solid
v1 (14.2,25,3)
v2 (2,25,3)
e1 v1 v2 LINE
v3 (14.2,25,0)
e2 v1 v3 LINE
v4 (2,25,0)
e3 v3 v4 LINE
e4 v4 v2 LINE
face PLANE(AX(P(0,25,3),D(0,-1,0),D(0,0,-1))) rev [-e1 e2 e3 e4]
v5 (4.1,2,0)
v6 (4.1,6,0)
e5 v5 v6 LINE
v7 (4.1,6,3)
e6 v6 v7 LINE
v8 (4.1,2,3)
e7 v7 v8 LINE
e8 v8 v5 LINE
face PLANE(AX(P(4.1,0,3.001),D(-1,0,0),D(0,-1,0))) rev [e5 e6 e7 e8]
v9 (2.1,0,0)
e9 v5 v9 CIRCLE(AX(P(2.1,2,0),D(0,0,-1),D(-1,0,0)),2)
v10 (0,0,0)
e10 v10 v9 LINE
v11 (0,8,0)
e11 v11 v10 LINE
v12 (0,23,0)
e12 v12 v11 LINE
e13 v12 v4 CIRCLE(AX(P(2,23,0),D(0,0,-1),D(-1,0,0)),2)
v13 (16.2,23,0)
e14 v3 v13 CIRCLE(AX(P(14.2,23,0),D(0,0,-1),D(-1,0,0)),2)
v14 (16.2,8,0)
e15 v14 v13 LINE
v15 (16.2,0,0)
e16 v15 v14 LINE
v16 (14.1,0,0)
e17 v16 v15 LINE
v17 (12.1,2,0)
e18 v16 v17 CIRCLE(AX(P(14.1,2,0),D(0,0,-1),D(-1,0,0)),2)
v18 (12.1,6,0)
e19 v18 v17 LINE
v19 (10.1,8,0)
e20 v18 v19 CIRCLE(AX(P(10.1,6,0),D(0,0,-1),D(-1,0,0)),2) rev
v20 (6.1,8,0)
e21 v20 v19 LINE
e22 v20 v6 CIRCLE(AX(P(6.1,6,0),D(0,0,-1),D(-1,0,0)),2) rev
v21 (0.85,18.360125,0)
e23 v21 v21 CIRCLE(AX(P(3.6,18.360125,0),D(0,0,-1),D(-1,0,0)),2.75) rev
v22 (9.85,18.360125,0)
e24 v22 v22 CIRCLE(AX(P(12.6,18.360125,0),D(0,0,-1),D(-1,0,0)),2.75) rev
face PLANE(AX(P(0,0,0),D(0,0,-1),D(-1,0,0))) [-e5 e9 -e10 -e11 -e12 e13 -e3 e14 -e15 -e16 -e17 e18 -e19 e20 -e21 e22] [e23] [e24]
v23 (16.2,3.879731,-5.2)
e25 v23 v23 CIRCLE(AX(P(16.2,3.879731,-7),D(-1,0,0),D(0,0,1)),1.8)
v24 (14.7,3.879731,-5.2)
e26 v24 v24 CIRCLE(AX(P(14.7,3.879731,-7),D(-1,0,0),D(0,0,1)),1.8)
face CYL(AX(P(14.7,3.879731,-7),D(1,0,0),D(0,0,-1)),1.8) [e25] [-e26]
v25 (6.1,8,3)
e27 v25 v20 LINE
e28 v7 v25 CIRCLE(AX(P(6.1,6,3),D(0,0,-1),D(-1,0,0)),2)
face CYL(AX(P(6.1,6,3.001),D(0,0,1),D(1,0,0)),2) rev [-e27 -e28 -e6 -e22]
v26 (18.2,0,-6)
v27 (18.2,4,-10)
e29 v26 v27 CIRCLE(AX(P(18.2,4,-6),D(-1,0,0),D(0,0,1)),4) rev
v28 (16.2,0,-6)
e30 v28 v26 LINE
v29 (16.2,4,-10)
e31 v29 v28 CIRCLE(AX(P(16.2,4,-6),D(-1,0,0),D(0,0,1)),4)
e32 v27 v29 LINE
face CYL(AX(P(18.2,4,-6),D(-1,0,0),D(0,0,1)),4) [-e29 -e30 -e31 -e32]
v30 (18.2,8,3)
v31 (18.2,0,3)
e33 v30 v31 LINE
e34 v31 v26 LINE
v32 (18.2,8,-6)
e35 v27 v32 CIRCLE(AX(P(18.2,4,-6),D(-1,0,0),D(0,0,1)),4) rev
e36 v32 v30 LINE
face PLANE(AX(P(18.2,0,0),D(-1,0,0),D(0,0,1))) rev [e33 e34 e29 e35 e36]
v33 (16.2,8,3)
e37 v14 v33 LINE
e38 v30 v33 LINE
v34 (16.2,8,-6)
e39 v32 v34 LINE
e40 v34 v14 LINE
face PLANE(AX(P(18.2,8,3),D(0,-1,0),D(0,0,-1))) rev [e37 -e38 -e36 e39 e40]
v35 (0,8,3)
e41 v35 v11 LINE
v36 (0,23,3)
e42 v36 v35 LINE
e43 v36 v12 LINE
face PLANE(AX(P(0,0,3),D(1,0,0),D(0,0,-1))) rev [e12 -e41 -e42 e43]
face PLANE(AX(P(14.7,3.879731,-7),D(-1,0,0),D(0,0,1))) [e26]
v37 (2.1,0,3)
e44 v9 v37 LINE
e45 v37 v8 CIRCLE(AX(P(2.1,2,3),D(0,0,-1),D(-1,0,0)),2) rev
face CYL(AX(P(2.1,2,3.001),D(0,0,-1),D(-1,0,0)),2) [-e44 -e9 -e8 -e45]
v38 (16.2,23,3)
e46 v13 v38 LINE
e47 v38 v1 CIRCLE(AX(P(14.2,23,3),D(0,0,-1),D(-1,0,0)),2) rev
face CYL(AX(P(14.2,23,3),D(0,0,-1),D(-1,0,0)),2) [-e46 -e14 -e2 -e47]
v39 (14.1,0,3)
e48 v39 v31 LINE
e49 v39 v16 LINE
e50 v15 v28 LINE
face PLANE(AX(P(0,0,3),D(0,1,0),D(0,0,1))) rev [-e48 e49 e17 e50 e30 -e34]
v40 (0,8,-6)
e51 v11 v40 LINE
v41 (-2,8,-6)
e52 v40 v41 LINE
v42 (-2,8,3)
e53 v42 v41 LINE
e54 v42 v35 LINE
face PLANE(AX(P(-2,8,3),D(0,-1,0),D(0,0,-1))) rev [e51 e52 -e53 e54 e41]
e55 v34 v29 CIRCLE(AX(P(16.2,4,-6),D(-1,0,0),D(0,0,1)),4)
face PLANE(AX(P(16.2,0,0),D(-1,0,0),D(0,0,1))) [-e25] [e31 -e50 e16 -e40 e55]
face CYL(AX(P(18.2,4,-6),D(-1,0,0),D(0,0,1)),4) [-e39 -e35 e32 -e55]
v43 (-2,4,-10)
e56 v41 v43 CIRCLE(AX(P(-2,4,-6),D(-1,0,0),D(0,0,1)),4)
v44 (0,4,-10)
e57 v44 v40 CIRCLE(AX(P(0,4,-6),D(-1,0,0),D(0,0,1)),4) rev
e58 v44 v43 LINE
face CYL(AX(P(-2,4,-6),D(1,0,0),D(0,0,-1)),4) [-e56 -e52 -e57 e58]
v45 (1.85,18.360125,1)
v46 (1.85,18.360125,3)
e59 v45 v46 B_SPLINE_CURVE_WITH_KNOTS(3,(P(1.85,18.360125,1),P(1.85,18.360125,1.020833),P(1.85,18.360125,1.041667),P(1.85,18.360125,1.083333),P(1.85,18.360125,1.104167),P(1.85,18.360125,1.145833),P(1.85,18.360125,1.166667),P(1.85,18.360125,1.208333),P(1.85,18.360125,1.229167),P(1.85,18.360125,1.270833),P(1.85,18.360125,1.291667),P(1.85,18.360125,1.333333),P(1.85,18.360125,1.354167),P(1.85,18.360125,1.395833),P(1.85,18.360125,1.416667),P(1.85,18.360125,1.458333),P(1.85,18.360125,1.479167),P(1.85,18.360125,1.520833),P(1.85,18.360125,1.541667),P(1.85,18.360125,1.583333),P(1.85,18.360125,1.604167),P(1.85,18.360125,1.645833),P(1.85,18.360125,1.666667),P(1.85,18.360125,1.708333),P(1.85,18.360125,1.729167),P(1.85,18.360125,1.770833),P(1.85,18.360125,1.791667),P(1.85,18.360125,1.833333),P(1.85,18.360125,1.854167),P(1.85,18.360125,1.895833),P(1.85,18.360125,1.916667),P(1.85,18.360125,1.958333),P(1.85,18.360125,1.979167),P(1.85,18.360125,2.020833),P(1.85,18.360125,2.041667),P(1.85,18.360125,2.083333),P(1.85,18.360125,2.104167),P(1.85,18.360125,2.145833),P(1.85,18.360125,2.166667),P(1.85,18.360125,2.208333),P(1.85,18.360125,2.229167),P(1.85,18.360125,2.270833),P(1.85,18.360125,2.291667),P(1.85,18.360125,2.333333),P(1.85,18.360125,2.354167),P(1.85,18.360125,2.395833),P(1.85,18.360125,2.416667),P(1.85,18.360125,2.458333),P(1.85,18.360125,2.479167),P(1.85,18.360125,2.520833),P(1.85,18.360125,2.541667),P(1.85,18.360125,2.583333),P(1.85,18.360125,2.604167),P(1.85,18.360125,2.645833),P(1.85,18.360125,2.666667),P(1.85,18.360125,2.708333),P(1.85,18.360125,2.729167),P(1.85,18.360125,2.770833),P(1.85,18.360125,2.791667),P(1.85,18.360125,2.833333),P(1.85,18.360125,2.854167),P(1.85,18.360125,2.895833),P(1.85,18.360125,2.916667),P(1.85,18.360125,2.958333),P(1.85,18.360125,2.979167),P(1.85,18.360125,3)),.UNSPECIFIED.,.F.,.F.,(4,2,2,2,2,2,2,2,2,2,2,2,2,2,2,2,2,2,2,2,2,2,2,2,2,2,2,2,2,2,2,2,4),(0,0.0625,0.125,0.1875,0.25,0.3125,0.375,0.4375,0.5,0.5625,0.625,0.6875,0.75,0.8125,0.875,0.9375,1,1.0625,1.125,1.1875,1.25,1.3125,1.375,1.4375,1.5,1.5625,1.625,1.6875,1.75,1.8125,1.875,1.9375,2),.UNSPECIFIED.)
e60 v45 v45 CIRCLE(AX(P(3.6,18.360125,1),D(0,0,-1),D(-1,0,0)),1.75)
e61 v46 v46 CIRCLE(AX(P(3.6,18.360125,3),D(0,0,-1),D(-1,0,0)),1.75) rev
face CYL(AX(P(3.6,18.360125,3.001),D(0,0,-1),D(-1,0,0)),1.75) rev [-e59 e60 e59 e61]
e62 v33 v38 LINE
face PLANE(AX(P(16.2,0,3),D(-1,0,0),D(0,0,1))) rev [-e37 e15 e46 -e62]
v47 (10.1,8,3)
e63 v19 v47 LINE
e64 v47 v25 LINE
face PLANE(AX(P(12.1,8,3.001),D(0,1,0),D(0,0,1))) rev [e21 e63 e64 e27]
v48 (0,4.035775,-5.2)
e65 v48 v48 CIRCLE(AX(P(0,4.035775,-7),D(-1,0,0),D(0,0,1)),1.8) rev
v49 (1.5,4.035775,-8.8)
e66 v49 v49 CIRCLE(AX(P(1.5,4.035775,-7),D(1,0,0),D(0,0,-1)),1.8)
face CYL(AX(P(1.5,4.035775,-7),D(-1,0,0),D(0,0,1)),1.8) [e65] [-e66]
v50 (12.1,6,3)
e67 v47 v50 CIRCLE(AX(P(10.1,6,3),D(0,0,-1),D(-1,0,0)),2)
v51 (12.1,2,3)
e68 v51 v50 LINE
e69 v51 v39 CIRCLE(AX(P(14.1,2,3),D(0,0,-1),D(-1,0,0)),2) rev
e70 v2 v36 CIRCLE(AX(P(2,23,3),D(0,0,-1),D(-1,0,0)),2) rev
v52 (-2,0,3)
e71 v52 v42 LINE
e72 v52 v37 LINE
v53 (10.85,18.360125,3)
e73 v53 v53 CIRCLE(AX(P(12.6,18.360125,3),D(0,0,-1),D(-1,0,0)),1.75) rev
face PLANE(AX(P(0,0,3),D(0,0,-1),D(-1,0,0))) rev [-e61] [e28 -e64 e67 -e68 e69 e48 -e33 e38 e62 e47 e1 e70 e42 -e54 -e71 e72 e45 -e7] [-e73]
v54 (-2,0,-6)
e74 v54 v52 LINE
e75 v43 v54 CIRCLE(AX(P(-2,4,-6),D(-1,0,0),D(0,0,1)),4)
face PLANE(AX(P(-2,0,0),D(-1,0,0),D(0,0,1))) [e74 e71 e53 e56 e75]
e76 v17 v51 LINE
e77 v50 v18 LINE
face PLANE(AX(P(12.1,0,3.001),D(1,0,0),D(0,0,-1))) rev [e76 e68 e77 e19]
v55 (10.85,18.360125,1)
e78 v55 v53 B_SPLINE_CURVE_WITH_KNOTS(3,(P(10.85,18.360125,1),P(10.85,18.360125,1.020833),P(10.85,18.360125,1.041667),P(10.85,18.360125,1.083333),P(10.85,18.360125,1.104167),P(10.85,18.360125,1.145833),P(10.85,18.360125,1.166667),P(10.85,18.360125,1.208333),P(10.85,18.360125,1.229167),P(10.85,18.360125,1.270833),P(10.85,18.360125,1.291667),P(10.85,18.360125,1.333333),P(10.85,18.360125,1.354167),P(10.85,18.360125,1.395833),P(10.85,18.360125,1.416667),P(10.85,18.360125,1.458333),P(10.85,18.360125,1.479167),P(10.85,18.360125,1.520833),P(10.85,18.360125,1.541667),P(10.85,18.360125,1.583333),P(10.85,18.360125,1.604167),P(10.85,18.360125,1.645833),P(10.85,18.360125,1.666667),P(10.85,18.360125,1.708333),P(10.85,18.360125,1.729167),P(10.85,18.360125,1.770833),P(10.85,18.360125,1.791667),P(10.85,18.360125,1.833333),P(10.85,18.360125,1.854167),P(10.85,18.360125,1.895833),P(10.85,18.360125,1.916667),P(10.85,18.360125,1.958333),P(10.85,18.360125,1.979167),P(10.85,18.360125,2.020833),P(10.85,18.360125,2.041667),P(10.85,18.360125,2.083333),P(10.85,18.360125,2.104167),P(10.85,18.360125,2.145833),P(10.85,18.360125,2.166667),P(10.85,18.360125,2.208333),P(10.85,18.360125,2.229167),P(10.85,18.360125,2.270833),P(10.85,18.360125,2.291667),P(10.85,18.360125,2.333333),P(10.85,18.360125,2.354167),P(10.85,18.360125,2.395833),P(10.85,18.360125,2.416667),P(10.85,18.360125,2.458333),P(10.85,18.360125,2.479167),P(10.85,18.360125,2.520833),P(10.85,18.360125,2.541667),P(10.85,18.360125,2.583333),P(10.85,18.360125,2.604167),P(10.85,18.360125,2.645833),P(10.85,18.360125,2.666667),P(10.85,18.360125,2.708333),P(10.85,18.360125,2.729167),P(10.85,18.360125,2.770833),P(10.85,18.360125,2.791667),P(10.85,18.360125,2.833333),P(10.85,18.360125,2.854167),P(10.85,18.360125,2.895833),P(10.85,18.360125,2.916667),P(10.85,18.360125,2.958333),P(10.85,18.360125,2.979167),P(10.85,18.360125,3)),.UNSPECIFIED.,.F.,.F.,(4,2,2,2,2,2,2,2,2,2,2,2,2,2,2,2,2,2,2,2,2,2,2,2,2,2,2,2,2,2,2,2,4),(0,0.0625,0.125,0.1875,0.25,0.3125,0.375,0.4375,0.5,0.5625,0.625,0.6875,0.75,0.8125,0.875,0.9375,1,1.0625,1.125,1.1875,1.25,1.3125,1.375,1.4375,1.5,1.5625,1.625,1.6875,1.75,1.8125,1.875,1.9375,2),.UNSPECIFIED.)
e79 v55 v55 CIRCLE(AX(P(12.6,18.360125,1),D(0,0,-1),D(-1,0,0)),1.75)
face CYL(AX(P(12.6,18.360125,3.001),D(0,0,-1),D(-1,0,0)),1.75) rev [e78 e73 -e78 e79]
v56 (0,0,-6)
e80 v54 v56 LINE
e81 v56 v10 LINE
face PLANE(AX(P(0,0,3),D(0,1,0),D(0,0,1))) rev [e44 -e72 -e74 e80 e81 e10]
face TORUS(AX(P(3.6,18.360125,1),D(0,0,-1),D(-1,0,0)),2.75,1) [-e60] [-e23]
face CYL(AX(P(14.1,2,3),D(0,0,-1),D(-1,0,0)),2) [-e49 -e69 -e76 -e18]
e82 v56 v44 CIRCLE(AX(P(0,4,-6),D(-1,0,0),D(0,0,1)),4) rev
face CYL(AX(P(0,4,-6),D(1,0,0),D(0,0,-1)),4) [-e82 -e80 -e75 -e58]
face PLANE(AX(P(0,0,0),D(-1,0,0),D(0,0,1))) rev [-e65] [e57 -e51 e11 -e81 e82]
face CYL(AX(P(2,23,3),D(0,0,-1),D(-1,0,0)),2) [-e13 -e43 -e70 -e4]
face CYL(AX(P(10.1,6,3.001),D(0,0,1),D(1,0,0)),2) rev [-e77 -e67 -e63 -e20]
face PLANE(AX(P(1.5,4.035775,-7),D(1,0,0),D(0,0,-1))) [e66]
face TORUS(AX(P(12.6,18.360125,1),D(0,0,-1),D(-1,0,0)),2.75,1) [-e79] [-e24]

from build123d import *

# Parameters (mm, degrees)
ESQUISSE1_W             = 16.2
ESQUISSE1_H             = 25
BOSS_EXTRU_1_DEPTH      = 3
ESQUISSE2_W             = 13
ESQUISSE2_H             = 8
BOSS_EXTRU_2_DEPTH      = 2
ESQUISSE3_R             = 1.8
BOSS_EXTRU_3_DEPTH      = 1.5
ESQUISSE5_W             = 13
ESQUISSE5_H             = 8
BOSS_EXTRU_4_DEPTH      = 2
ESQUISSE6_R             = 1.8
BOSS_EXTRU_5_DEPTH      = 1.5
ENL_V_MAT_EXTRU_1_REACH = 34.5
ESQUISSE7_W             = 8
ESQUISSE7_H             = 8
ENL_V_MAT_EXTRU_2_REACH = 34.5
ESQUISSE8_R             = 1.75
CONG_1_R                = 1
CONG_2_R                = 4
CONG_3_R                = 2
CONG_4_R                = 2


with BuildPart() as part:
    # Esquisse1 → Boss.-Extru.1 (new body)
    with BuildSketch(Plane.XY):
        with Locations((8.1, 12.5)):
            Rectangle(ESQUISSE1_W, ESQUISSE1_H)
    extrude(amount=BOSS_EXTRU_1_DEPTH)

    # Esquisse2 → Boss.-Extru.2 (add)
    with BuildSketch(Plane.ZY):
        with Locations((-3.5, 4)):
            Rectangle(ESQUISSE2_W, ESQUISSE2_H)
    extrude(amount=BOSS_EXTRU_2_DEPTH)

    # Esquisse3 → Boss.-Extru.3 (add)
    with BuildSketch(Plane(origin=(0, 0, 0), x_dir=(0, 0, -1), z_dir=(1, 0, 0))):
        with Locations(Location((7, 4.035774971, 0), (0, 0, 180))):
            Circle(ESQUISSE3_R)
    extrude(amount=BOSS_EXTRU_3_DEPTH)

    # Esquisse5 → Boss.-Extru.4 (add)
    with BuildSketch(Plane(origin=(16.2, 0, 0), x_dir=(0, 0, -1), z_dir=(1, 0, 0))):
        with Locations((3.5, 4)):
            Rectangle(ESQUISSE5_W, ESQUISSE5_H)
    extrude(amount=BOSS_EXTRU_4_DEPTH)

    # Esquisse6 → Boss.-Extru.5 (add)
    with BuildSketch(Plane.ZY.offset(-16.2)):
        with Locations((-7, 3.879731229)):
            Circle(ESQUISSE6_R)
    extrude(amount=BOSS_EXTRU_5_DEPTH)

    # Esquisse7 → Enlèv. mat.-Extru.1 (cut, up to next)
    with BuildSketch(Plane(origin=(0, 0, 0), x_dir=(-1, 0, 0), z_dir=(0, 0, -1)), mode=Mode.PRIVATE) as enl_v_mat_extru_1_sk1:
        with Locations((-8.1, 4)):
            Rectangle(ESQUISSE7_W, ESQUISSE7_H)
    enl_v_mat_extru_1_tool1 = extrude(enl_v_mat_extru_1_sk1.sketch, amount=-ENL_V_MAT_EXTRU_1_REACH, mode=Mode.PRIVATE) & part.part
    add(enl_v_mat_extru_1_tool1.solids().sort_by_distance((8.1, 4, 0))[0], mode=Mode.SUBTRACT)

    # Esquisse8 → Enlèv. mat.-Extru.2 (cut, up to next)
    with BuildSketch(Plane(origin=(0, 0, 0), x_dir=(-1, 0, 0), z_dir=(0, 0, -1)), mode=Mode.PRIVATE) as enl_v_mat_extru_2_sk1:
        with Locations((-12.6, 18.360124913)):
            Circle(ESQUISSE8_R)
    enl_v_mat_extru_2_tool1 = extrude(enl_v_mat_extru_2_sk1.sketch, amount=-ENL_V_MAT_EXTRU_2_REACH, mode=Mode.PRIVATE) & part.part
    # Esquisse8 → Enlèv. mat.-Extru.2 (cut, up to next)
    with BuildSketch(Plane(origin=(0, 0, 0), x_dir=(-1, 0, 0), z_dir=(0, 0, -1)), mode=Mode.PRIVATE) as enl_v_mat_extru_2_sk2:
        with Locations((-3.6, 18.360124913)):
            Circle(ESQUISSE8_R)
    enl_v_mat_extru_2_tool2 = extrude(enl_v_mat_extru_2_sk2.sketch, amount=-ENL_V_MAT_EXTRU_2_REACH, mode=Mode.PRIVATE) & part.part
    add(enl_v_mat_extru_2_tool1.solids().sort_by_distance((12.6, 18.360125, 0))[0], mode=Mode.SUBTRACT)
    add(enl_v_mat_extru_2_tool2.solids().sort_by_distance((3.6, 18.360125, 0))[0], mode=Mode.SUBTRACT)

    # Congé1
    cong_1_edges = [part.edges().sort_by_distance(p)[0] for p in [
        (14.35, 18.360124913, 0),
        (5.35, 18.360124913, 0),
    ]]
    fillet(cong_1_edges, radius=CONG_1_R)

    # Congé2
    cong_2_edges = [part.edges().sort_by_distance(p)[0] for p in [
        (-1, 8, -10),
        (-1, 0, -10),
        (17.2, 0, -10),
        (17.2, 8, -10),
    ]]
    fillet(cong_2_edges, radius=CONG_2_R - 0.0001)  # a hair under: the kernel refuses the full size

    # Congé3
    cong_3_edges = [part.edges().sort_by_distance(p)[0] for p in [
        (12.1, 0, 1.5),
        (12.1, 8, 1.5),
        (4.1, 8, 1.5),
        (4.1, 0, 1.5),
    ]]
    fillet(cong_3_edges, radius=CONG_3_R)

    # Congé4
    cong_4_edges = [part.edges().sort_by_distance(p)[0] for p in [
        (0, 25, 1.5),
        (16.2, 25, 1.5),
    ]]
    fillet(cong_4_edges, radius=CONG_4_R)


solid = part.part
